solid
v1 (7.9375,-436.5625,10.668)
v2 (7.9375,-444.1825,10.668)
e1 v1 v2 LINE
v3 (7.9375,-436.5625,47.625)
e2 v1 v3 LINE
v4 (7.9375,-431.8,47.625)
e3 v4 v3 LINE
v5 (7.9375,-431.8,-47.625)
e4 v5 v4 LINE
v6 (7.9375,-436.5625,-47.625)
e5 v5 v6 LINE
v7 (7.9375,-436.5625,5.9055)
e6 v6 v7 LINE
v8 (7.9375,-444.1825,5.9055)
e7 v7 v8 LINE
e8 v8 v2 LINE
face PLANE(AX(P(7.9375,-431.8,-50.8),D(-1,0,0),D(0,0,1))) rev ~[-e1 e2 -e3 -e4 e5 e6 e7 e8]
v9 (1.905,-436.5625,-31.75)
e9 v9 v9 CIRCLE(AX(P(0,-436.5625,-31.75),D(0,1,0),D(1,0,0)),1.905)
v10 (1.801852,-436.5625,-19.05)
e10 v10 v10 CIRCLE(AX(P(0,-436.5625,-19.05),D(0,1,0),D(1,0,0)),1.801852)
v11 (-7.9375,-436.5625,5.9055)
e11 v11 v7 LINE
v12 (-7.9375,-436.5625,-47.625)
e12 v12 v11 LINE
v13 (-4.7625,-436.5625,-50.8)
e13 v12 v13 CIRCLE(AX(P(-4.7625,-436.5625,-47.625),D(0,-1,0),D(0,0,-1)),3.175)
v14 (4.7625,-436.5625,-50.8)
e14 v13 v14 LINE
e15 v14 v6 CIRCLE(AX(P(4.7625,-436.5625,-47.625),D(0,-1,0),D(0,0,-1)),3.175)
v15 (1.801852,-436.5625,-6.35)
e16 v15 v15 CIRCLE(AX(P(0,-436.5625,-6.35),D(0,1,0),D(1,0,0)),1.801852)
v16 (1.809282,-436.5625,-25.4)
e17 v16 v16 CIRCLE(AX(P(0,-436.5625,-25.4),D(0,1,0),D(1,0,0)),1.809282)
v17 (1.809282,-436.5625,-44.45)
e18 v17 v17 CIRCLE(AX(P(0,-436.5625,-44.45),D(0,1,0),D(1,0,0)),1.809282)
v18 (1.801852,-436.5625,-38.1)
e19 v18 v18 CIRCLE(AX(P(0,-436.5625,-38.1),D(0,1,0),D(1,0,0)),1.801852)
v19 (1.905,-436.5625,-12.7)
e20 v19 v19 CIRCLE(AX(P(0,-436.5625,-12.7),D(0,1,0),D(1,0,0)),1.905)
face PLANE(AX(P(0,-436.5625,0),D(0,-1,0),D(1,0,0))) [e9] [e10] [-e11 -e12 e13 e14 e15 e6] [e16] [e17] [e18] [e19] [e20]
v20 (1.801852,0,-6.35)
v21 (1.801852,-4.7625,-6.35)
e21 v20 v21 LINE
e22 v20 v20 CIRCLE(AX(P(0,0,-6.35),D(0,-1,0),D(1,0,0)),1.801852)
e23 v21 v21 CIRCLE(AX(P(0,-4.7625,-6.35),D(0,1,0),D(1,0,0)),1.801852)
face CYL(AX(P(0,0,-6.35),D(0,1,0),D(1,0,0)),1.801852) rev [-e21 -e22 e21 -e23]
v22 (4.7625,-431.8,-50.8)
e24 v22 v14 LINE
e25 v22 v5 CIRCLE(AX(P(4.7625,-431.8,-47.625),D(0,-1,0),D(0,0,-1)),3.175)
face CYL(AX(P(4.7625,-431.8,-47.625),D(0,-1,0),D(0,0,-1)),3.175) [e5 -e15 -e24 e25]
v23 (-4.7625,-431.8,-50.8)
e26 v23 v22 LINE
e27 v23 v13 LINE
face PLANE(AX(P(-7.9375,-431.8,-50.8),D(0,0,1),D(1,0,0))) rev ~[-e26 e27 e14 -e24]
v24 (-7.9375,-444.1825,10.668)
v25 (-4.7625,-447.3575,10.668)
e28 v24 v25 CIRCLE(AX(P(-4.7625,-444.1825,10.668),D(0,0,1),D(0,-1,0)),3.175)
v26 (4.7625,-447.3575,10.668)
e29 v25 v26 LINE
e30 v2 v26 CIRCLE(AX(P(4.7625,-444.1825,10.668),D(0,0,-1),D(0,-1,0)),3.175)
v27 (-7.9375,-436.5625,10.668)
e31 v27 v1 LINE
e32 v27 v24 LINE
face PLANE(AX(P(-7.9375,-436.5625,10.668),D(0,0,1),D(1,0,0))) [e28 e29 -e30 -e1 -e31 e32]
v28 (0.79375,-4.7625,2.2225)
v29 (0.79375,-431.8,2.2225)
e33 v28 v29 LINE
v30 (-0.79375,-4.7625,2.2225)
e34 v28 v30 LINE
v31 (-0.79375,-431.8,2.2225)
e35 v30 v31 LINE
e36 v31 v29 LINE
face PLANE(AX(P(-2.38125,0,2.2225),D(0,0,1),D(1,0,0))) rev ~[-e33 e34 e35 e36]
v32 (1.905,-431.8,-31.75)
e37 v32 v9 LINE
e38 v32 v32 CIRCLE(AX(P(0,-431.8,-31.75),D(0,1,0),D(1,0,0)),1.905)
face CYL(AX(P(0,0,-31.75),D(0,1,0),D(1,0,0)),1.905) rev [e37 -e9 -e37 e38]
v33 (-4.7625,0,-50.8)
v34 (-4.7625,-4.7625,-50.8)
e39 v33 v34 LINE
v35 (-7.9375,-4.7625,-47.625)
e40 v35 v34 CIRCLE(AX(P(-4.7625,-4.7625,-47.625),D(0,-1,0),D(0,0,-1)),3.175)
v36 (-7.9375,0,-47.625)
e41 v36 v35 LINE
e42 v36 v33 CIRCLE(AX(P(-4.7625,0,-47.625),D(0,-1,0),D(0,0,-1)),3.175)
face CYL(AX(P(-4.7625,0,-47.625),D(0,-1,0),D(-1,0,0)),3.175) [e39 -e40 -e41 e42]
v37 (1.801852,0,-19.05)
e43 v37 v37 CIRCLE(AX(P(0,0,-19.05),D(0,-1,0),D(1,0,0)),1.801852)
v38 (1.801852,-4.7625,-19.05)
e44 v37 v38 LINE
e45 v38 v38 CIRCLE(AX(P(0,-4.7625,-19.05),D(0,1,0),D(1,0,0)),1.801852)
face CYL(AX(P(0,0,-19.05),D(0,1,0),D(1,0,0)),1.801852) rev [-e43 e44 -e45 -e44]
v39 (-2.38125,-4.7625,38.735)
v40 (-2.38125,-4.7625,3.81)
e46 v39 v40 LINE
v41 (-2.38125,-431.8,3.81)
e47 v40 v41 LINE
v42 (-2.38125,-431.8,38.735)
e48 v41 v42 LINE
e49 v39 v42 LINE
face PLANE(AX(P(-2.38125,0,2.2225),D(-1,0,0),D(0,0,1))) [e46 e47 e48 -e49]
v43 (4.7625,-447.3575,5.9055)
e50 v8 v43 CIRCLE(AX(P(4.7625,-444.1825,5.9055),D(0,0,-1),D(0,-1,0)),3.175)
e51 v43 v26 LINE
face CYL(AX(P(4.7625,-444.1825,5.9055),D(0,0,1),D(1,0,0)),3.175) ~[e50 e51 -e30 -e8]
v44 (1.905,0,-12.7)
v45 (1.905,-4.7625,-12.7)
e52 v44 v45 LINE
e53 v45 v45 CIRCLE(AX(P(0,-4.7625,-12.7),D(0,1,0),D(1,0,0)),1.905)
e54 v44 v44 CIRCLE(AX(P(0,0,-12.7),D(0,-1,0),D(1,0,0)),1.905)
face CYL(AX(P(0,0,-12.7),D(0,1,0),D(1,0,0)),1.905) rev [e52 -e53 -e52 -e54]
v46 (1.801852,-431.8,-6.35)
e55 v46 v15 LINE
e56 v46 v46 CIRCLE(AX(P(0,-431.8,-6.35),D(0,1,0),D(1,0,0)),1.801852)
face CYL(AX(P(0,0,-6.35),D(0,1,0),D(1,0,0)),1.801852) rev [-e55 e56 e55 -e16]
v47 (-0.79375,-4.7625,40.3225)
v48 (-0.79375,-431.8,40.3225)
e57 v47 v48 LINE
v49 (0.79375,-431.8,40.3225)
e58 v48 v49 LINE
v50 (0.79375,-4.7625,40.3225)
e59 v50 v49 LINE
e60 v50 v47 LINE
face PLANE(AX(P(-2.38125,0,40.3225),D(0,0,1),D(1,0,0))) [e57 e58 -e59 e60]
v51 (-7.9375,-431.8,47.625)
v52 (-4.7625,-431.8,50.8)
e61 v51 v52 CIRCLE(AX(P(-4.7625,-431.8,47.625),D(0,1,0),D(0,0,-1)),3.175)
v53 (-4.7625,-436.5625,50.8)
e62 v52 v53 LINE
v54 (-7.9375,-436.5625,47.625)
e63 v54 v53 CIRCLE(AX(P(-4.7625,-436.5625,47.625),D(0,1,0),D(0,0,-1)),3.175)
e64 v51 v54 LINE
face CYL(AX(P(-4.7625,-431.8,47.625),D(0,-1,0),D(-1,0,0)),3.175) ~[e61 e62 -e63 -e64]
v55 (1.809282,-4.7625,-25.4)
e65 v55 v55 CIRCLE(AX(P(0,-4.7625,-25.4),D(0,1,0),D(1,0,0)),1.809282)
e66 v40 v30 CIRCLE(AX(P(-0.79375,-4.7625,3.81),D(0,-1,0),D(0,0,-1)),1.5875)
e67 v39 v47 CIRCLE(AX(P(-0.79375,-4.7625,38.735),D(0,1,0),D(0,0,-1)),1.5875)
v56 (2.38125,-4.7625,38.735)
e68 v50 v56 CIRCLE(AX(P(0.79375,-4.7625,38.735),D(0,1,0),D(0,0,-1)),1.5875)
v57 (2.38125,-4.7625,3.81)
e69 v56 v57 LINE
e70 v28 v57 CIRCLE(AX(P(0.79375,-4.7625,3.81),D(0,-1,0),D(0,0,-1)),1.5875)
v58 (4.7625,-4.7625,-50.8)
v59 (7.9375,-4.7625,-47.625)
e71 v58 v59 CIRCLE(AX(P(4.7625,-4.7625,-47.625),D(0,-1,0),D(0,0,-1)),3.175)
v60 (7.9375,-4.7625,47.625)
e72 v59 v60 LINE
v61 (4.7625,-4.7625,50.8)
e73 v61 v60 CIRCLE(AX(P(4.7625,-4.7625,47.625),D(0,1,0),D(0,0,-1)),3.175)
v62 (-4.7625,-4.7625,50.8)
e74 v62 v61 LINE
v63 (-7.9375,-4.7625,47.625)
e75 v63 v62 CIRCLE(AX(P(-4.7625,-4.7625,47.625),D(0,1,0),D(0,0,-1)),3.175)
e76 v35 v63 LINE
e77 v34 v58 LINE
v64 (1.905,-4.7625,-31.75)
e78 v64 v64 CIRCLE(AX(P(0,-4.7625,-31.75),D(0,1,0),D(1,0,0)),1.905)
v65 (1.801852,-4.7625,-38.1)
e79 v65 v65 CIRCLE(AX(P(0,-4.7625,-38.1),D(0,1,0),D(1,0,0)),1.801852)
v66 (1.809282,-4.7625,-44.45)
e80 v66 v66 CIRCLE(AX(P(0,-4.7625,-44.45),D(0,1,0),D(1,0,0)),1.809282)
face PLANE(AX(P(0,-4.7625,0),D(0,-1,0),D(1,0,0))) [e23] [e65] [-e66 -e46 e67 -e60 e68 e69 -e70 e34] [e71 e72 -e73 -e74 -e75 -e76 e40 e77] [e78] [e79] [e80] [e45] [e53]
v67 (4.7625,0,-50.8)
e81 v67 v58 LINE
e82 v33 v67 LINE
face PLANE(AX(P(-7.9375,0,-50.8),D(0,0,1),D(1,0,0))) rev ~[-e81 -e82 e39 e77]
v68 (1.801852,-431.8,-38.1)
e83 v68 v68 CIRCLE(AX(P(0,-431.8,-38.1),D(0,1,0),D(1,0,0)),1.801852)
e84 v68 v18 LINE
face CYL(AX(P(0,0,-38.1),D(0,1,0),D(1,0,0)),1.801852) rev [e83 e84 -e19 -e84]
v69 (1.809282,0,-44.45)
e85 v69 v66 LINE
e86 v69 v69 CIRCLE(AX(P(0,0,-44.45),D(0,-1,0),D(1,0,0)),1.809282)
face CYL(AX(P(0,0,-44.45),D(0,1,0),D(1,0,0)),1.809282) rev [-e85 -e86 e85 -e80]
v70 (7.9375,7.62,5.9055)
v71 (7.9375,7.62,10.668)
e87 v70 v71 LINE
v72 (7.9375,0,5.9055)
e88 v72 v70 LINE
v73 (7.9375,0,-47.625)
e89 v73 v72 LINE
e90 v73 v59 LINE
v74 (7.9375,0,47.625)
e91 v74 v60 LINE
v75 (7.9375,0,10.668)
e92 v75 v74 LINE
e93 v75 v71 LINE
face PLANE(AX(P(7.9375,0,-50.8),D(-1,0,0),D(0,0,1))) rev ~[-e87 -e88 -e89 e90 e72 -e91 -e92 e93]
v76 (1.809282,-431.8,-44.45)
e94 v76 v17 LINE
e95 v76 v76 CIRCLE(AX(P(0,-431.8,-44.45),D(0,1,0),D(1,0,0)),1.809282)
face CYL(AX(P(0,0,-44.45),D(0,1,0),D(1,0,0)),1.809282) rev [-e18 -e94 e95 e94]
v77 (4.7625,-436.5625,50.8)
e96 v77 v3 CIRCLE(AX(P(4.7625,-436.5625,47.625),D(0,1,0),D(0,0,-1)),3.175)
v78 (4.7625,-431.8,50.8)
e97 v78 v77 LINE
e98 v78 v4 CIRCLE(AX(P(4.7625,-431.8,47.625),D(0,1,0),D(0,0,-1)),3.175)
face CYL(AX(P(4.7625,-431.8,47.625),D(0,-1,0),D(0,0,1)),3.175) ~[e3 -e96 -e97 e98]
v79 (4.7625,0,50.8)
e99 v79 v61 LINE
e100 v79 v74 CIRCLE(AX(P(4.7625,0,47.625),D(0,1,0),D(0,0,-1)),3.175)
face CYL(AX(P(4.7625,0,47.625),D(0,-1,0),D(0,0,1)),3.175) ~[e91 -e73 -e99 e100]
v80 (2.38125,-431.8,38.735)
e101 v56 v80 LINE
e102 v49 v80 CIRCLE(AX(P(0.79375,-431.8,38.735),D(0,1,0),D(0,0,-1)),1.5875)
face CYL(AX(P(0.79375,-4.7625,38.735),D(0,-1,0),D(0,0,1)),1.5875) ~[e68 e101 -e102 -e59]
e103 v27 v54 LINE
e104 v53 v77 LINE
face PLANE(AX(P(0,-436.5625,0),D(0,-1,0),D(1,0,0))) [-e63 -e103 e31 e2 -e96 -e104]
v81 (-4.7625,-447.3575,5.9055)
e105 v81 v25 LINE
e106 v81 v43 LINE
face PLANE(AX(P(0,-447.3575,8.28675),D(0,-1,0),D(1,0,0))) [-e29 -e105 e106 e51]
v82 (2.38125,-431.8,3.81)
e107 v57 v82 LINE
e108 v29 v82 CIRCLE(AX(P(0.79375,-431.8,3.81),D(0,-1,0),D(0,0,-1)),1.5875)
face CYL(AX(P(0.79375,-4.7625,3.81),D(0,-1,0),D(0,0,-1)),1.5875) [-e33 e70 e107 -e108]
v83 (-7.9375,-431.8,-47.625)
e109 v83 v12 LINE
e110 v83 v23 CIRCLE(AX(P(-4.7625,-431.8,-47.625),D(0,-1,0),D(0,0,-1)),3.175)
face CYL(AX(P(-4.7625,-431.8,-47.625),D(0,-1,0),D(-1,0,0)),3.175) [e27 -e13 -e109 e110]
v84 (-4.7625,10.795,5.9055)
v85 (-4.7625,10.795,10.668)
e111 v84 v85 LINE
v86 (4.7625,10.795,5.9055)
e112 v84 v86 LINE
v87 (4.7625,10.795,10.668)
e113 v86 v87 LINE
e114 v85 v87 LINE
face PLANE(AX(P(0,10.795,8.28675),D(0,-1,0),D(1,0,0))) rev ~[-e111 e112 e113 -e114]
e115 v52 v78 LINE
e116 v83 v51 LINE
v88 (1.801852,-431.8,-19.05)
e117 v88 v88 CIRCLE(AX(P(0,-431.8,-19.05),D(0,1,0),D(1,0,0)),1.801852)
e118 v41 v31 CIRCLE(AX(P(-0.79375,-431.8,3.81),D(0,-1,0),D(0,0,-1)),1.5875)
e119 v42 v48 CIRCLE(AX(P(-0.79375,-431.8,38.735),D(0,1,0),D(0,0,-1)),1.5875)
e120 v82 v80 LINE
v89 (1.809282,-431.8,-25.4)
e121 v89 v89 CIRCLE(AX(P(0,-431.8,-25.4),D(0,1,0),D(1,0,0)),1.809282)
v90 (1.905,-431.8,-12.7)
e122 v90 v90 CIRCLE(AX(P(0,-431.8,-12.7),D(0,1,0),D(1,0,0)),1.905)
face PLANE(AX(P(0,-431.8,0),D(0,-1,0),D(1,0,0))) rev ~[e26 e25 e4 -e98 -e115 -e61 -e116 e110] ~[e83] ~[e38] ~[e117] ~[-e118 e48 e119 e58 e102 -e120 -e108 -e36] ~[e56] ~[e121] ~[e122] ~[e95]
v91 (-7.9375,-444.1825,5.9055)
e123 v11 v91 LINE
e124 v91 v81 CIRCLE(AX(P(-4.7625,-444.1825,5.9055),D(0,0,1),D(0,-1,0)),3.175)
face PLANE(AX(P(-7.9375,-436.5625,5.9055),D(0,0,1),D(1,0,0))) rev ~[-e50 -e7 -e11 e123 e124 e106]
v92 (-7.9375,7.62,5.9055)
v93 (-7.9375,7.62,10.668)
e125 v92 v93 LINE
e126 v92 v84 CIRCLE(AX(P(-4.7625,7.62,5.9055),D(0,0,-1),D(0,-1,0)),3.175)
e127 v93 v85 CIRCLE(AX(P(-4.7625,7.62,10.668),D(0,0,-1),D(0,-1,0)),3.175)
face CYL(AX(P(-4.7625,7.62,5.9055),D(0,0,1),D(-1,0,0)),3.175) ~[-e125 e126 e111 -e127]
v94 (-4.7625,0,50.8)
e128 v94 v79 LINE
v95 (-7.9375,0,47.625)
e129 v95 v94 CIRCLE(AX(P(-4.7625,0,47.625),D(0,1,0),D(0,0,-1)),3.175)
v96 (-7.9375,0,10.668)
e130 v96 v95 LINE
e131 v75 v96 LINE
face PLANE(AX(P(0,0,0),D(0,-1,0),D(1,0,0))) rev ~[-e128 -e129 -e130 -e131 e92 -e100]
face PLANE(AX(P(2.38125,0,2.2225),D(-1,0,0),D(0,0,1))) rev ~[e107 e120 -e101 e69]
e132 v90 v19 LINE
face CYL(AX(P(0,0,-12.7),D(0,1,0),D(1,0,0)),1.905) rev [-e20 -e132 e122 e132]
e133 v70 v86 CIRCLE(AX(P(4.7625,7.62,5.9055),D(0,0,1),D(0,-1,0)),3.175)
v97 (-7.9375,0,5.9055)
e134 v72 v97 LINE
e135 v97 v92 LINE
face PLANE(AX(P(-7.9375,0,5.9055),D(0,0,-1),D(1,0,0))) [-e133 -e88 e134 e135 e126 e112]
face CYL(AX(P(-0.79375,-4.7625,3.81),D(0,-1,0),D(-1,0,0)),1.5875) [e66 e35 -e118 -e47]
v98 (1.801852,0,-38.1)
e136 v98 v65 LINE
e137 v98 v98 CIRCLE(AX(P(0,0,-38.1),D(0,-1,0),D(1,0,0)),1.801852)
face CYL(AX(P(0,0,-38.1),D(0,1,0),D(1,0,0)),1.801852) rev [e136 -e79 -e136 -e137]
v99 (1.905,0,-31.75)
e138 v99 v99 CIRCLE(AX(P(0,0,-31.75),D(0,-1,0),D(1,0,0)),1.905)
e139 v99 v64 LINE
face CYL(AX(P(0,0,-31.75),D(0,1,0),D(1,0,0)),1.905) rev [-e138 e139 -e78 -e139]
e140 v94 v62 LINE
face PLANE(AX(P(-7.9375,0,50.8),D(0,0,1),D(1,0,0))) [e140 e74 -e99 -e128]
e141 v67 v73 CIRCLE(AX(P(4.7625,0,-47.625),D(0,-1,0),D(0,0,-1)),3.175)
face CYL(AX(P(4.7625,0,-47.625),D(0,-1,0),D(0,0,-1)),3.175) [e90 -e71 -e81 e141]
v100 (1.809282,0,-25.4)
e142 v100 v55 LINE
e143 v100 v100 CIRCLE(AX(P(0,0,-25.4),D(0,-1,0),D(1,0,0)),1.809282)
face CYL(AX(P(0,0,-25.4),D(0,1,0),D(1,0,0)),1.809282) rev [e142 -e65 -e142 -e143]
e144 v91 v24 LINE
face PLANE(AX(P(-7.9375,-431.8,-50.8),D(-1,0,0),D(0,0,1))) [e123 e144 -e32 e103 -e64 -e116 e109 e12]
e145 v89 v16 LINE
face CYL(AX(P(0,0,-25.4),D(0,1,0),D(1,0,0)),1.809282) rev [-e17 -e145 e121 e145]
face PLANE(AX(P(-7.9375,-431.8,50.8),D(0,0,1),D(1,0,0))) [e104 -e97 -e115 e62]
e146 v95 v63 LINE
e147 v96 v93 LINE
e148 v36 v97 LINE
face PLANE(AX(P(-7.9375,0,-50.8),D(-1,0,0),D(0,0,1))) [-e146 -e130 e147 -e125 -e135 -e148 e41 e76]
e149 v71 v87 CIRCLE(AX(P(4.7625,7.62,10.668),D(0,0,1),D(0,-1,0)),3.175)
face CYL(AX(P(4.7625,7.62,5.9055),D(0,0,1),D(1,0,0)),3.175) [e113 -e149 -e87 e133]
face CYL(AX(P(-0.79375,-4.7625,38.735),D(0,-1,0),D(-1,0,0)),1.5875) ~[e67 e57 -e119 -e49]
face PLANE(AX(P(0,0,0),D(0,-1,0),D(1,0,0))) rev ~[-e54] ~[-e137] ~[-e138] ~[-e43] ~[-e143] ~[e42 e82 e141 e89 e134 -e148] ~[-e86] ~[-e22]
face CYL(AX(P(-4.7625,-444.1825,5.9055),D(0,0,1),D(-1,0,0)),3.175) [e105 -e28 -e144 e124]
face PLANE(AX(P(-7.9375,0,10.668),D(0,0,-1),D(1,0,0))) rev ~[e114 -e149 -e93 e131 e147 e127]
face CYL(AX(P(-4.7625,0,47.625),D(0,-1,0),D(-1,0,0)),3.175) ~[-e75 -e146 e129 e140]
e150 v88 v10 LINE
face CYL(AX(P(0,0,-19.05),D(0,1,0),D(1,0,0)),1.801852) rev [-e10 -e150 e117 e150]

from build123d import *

# Parameters (mm, degrees)
F0_W     = 15.875
F0_H     = 101.6
F4_DEPTH = 4.7625
F2_W     = 15.875
F2_H     = 4.7625
F5_DEPTH = 10.795
F1_W     = 4.7625
F1_H     = 38.1
F6_DEPTH = 431.8
F7_START = 431.8
F7_DEPTH = 4.7625
F8_START = 436.5625
F8_DEPTH = 10.795
F3_R     = 1.905
F3_R_2   = 1.8018515142
F3_R_3   = 1.8092820601
F9_DEPTH = 447.3585
F11_R    = 1.5875
F12_R    = 3.175


with BuildPart() as f4:
    # F0 (on Front) → F4 (new body)
    with BuildSketch(Plane.XZ):
        Rectangle(F0_W, F0_H)
    extrude(amount=F4_DEPTH)

    # F2 (on Front) → F5 (join)
    with BuildSketch(Plane.XZ):
        with Locations((0, 8.28675)):
            Rectangle(F2_W, F2_H)
    extrude(amount=-F5_DEPTH)

    # F1 (on Front) → F6 (join)
    with BuildSketch(Plane.XZ):
        with Locations((0, 21.2725)):
            Rectangle(F1_W, F1_H)
    extrude(amount=F6_DEPTH)

    # F0 (on Front) → F7 (join)
    with BuildSketch(Plane.XZ.offset(F7_START)):
        Rectangle(F0_W, F0_H)
    extrude(amount=F7_DEPTH)

    # F2 (on Front) → F8 (join)
    with BuildSketch(Plane.XZ.offset(F8_START)):
        with Locations((0, 8.28675)):
            Rectangle(F2_W, F2_H)
    extrude(amount=F8_DEPTH)

    # F3 (on Front) → F9 (cut, through all)
    with BuildSketch(Plane.XZ):
        with Locations((0, -31.75)):
            Circle(F3_R)
        with Locations((0, -38.1)):
            Circle(F3_R_2)
        with Locations((0, -44.45)):
            Circle(F3_R_3)
        with Locations((0, -12.7)):
            Circle(F3_R)
        with Locations((0, -19.05)):
            Circle(F3_R_2)
        with Locations((0, -25.4)):
            Circle(F3_R_3)
        with Locations((0, -6.35)):
            Circle(F3_R_2)
    extrude(amount=F9_DEPTH, mode=Mode.SUBTRACT)

    # F11
    f11_edges = [f4.edges().sort_by_distance(p)[0] for p in [
        (-2.38125, -218.28125, 40.3225),
        (2.38125, -218.28125, 40.3225),
        (2.38125, -218.28125, 2.2225),
        (-2.38125, -218.28125, 2.2225),
    ]]
    fillet(f11_edges, radius=F11_R)

    # F12
    f12_edges = [f4.edges().sort_by_distance(p)[0] for p in [
        (7.9375, -434.18125, 50.8),
        (-7.9375, -434.18125, 50.8),
        (7.9375, -434.18125, -50.8),
        (-7.9375, -434.18125, -50.8),
        (-7.9375, -447.3575, 8.28675),
        (7.9375, -447.3575, 8.28675),
        (7.9375, -2.38125, 50.8),
        (-7.9375, -2.38125, 50.8),
        (7.9375, -2.38125, -50.8),
        (-7.9375, -2.38125, -50.8),
        (-7.9375, 10.795, 8.28675),
        (7.9375, 10.795, 8.28675),
    ]]
    fillet(f12_edges, radius=F12_R)


solid = f4.part
